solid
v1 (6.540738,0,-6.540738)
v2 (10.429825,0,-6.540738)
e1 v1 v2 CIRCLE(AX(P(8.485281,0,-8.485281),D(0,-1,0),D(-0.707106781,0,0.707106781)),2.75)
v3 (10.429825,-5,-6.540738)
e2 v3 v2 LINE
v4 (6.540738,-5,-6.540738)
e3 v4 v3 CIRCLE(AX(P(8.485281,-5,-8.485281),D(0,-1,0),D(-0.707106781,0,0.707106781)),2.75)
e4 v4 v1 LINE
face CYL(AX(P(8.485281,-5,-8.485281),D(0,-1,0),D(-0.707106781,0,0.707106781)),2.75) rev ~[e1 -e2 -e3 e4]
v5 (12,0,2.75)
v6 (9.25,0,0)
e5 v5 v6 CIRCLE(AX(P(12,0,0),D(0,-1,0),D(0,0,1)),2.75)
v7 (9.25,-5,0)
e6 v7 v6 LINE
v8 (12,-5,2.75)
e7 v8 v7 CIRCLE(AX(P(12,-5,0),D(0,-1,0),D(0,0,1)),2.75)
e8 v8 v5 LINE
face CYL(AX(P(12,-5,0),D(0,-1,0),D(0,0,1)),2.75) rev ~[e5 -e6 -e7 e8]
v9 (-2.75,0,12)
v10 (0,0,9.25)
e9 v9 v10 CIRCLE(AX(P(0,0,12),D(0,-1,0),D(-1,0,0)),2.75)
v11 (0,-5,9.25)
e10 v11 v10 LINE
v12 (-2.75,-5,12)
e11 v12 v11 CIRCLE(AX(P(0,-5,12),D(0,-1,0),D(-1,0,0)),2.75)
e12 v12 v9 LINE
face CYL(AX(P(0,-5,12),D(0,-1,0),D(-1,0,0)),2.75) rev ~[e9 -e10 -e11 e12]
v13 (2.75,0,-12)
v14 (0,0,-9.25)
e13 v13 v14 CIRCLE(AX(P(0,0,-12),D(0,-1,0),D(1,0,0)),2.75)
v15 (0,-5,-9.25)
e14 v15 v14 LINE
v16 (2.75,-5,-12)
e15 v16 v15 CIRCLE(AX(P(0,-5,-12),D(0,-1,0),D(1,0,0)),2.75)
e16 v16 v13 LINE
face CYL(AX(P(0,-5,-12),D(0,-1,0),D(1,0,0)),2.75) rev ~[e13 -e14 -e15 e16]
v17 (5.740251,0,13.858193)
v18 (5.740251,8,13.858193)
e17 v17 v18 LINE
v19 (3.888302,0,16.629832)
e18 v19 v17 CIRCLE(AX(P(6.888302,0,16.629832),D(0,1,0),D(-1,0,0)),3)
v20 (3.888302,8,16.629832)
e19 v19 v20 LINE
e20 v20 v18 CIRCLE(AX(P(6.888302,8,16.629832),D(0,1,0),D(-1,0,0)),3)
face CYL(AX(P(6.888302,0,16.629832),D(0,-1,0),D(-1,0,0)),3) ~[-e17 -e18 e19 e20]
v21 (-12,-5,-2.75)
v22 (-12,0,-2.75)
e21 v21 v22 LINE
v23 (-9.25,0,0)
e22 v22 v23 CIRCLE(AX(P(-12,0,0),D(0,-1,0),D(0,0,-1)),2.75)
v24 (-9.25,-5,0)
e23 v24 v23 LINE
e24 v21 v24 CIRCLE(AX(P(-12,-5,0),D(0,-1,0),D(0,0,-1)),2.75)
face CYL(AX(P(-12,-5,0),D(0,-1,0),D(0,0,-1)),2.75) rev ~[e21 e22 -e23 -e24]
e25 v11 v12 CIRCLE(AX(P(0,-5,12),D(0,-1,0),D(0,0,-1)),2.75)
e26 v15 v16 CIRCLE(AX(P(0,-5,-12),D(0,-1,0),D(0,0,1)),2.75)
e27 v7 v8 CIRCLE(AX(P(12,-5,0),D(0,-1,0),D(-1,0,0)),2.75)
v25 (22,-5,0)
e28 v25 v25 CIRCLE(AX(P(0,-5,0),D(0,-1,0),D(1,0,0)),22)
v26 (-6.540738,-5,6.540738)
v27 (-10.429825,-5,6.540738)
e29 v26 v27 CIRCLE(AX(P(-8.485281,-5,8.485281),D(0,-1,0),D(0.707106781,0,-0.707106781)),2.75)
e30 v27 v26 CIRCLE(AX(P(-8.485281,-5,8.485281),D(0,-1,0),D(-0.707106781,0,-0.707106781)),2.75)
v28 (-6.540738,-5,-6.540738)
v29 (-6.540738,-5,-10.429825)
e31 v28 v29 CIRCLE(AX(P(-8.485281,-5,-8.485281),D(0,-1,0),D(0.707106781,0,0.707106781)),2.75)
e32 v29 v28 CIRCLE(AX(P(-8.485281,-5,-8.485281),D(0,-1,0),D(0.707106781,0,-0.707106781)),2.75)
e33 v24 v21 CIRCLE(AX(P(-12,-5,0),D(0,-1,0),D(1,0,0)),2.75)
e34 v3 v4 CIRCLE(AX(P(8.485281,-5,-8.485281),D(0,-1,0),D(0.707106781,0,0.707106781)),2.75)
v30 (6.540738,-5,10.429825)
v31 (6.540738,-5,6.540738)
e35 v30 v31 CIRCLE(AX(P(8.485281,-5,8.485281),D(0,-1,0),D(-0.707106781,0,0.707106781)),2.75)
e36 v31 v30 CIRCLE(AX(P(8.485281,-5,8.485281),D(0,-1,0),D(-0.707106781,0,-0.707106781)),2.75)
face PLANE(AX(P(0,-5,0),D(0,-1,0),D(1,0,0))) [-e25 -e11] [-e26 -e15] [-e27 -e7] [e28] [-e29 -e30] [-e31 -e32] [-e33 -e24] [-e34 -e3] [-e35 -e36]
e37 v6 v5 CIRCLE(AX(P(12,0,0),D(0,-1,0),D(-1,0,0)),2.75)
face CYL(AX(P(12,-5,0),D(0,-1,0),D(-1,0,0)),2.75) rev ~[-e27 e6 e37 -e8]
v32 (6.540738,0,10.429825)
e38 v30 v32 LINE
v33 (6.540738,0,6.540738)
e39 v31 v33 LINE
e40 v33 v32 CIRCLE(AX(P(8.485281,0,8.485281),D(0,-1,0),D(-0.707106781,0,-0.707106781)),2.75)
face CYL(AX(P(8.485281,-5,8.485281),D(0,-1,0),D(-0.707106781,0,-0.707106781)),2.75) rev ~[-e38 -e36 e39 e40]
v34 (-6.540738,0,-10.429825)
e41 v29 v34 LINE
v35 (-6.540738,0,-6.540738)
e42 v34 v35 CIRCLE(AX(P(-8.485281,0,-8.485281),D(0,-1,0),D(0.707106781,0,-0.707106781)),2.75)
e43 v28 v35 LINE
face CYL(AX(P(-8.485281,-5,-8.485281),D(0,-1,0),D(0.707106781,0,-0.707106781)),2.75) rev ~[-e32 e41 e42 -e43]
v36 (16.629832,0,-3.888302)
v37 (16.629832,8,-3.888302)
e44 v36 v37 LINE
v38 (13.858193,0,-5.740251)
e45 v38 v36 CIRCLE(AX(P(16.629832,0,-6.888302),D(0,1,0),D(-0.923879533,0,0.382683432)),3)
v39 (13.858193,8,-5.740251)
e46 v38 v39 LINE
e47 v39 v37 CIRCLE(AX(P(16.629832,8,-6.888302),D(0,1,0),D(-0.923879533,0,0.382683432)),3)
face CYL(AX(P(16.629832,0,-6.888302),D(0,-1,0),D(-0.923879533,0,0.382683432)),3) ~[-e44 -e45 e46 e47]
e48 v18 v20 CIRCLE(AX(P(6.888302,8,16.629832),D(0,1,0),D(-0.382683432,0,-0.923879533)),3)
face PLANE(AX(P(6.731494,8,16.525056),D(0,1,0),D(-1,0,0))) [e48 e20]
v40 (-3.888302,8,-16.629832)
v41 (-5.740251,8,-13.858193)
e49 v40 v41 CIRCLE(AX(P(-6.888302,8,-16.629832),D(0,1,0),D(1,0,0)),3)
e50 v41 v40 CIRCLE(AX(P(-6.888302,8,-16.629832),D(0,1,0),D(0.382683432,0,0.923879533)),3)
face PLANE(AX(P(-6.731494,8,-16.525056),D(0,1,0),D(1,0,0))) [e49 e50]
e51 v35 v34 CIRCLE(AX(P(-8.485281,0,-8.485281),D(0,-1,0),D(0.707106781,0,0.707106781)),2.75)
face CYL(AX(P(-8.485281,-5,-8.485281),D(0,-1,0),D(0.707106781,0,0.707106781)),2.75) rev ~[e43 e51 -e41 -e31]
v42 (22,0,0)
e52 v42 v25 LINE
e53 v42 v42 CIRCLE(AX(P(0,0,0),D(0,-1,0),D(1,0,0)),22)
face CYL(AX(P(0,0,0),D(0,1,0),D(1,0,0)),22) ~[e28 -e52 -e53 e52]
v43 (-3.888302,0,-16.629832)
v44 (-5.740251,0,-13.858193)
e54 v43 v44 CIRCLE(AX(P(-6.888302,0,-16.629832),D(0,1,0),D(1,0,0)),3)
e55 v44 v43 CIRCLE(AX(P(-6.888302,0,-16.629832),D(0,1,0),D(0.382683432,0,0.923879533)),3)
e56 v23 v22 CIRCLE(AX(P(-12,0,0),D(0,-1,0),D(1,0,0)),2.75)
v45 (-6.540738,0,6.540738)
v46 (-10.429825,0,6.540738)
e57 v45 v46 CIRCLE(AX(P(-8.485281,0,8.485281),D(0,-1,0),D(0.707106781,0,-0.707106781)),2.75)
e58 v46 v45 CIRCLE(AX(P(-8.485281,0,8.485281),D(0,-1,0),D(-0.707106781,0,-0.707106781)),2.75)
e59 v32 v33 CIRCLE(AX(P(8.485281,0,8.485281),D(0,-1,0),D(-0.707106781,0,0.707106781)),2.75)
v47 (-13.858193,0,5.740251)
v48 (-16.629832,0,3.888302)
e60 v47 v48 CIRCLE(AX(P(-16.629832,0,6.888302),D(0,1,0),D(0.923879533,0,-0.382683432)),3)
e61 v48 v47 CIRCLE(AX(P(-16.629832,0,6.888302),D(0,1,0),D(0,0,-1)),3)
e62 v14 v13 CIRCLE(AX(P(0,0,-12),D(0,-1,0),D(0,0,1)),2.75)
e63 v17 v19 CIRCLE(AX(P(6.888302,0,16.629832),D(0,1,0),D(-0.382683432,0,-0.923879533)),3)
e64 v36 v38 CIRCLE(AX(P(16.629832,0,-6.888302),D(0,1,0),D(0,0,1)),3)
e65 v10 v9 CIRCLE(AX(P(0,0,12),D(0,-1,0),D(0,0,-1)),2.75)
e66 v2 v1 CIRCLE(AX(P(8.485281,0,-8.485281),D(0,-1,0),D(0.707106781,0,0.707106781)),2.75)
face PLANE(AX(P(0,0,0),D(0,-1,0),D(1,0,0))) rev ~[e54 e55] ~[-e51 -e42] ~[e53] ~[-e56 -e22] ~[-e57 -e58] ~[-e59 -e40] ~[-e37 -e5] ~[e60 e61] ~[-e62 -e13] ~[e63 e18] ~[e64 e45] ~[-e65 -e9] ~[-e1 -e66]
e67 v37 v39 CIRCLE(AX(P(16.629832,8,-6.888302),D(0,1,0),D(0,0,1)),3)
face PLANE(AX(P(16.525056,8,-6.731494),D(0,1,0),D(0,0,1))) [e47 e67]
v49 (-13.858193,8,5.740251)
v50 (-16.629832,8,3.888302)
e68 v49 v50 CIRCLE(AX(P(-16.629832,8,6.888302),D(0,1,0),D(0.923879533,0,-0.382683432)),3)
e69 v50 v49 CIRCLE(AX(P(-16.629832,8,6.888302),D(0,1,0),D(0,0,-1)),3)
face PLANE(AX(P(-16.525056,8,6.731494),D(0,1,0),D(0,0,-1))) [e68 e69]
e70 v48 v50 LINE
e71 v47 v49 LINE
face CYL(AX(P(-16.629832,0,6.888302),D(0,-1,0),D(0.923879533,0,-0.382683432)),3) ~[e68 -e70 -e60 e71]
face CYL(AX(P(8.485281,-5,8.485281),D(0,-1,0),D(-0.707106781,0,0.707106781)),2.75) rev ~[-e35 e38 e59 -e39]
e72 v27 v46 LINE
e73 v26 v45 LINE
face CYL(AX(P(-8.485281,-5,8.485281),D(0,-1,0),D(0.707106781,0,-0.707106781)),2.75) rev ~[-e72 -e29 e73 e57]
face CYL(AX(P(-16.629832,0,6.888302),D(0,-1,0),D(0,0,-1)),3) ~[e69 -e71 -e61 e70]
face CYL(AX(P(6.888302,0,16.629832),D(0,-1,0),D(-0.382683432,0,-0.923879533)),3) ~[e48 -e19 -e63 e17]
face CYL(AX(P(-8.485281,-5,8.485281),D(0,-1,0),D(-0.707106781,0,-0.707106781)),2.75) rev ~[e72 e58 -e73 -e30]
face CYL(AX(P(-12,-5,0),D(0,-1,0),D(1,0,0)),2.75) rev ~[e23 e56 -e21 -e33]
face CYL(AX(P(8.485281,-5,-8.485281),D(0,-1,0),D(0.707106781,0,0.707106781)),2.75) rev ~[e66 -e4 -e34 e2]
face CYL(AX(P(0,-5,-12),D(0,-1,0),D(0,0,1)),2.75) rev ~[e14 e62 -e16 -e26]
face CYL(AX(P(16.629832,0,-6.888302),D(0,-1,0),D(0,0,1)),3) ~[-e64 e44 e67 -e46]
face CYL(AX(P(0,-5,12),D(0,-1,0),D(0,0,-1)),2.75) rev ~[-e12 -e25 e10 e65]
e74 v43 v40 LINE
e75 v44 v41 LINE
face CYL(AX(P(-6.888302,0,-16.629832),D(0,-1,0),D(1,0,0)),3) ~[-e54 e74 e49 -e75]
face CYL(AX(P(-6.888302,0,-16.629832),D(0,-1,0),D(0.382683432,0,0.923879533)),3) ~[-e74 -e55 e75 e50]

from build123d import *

# Parameters (mm, degrees)
F0_R            = 22
F1_DEPTH        = 5
F3_DEPTH        = 25
F3_COPIES_COUNT = 8
F5_DEPTH        = 8
F5_COPIES_COUNT = 4


# Not quite as in the source:
# - a pattern or mirror of a feature is missing from the dataset's text; its kind, count and spacing are read off the source's solid
# - a feature names something its author has since deleted; it is built from what else it names


with BuildPart() as f1:
    # F0 (on Front) → F1 (new body)
    with BuildSketch(Plane.XZ):
        Circle(F0_R)
    extrude(amount=F1_DEPTH)

    # F2 (on face) → F3 (cut)
    with BuildSketch(Plane.XZ.offset(5)):
        with BuildLine():
            ThreePointArc((0, -9.25), (-1.9445436483, -13.9445436483), (2.75, -12))
            ThreePointArc((2.75, -12), (1.9445436483, -10.0554563517), (0, -9.25))
        make_face()
    f3 = extrude(amount=-F3_DEPTH, mode=Mode.SUBTRACT)

    # F3_copies: F3 ×8 about axis
    f3_copies_axis = Axis((0, 0, 0), (0, 1, 0))
    for i in range(1, F3_COPIES_COUNT):
        add(f3.rotate(f3_copies_axis, i * 360 / F3_COPIES_COUNT), mode=Mode.SUBTRACT)

    # F4 (on face) → F5 (join)
    with BuildSketch(Plane(origin=(0, 0, 0), x_dir=(-1, 0, 0), z_dir=(0, 1, 0))):
        with BuildLine():
            ThreePointArc((-5.7402514855, 13.8581929877), (-4.3938929457, 14.9631208861), (-3.8883017826, 16.6298315852))
            ThreePointArc((-3.8883017826, 16.6298315852), (-9.3827106195, 18.2965422843), (-5.7402514855, 13.8581929877))
        make_face()
    f5 = extrude(amount=F5_DEPTH)

    # F5_copies: F5 ×4 about axis
    f5_copies_axis = Axis((0, 0, 0), (0, 1, 0))
    for i in range(1, F5_COPIES_COUNT):
        add(f5.rotate(f5_copies_axis, i * 360 / F5_COPIES_COUNT))


solid = f1.part
